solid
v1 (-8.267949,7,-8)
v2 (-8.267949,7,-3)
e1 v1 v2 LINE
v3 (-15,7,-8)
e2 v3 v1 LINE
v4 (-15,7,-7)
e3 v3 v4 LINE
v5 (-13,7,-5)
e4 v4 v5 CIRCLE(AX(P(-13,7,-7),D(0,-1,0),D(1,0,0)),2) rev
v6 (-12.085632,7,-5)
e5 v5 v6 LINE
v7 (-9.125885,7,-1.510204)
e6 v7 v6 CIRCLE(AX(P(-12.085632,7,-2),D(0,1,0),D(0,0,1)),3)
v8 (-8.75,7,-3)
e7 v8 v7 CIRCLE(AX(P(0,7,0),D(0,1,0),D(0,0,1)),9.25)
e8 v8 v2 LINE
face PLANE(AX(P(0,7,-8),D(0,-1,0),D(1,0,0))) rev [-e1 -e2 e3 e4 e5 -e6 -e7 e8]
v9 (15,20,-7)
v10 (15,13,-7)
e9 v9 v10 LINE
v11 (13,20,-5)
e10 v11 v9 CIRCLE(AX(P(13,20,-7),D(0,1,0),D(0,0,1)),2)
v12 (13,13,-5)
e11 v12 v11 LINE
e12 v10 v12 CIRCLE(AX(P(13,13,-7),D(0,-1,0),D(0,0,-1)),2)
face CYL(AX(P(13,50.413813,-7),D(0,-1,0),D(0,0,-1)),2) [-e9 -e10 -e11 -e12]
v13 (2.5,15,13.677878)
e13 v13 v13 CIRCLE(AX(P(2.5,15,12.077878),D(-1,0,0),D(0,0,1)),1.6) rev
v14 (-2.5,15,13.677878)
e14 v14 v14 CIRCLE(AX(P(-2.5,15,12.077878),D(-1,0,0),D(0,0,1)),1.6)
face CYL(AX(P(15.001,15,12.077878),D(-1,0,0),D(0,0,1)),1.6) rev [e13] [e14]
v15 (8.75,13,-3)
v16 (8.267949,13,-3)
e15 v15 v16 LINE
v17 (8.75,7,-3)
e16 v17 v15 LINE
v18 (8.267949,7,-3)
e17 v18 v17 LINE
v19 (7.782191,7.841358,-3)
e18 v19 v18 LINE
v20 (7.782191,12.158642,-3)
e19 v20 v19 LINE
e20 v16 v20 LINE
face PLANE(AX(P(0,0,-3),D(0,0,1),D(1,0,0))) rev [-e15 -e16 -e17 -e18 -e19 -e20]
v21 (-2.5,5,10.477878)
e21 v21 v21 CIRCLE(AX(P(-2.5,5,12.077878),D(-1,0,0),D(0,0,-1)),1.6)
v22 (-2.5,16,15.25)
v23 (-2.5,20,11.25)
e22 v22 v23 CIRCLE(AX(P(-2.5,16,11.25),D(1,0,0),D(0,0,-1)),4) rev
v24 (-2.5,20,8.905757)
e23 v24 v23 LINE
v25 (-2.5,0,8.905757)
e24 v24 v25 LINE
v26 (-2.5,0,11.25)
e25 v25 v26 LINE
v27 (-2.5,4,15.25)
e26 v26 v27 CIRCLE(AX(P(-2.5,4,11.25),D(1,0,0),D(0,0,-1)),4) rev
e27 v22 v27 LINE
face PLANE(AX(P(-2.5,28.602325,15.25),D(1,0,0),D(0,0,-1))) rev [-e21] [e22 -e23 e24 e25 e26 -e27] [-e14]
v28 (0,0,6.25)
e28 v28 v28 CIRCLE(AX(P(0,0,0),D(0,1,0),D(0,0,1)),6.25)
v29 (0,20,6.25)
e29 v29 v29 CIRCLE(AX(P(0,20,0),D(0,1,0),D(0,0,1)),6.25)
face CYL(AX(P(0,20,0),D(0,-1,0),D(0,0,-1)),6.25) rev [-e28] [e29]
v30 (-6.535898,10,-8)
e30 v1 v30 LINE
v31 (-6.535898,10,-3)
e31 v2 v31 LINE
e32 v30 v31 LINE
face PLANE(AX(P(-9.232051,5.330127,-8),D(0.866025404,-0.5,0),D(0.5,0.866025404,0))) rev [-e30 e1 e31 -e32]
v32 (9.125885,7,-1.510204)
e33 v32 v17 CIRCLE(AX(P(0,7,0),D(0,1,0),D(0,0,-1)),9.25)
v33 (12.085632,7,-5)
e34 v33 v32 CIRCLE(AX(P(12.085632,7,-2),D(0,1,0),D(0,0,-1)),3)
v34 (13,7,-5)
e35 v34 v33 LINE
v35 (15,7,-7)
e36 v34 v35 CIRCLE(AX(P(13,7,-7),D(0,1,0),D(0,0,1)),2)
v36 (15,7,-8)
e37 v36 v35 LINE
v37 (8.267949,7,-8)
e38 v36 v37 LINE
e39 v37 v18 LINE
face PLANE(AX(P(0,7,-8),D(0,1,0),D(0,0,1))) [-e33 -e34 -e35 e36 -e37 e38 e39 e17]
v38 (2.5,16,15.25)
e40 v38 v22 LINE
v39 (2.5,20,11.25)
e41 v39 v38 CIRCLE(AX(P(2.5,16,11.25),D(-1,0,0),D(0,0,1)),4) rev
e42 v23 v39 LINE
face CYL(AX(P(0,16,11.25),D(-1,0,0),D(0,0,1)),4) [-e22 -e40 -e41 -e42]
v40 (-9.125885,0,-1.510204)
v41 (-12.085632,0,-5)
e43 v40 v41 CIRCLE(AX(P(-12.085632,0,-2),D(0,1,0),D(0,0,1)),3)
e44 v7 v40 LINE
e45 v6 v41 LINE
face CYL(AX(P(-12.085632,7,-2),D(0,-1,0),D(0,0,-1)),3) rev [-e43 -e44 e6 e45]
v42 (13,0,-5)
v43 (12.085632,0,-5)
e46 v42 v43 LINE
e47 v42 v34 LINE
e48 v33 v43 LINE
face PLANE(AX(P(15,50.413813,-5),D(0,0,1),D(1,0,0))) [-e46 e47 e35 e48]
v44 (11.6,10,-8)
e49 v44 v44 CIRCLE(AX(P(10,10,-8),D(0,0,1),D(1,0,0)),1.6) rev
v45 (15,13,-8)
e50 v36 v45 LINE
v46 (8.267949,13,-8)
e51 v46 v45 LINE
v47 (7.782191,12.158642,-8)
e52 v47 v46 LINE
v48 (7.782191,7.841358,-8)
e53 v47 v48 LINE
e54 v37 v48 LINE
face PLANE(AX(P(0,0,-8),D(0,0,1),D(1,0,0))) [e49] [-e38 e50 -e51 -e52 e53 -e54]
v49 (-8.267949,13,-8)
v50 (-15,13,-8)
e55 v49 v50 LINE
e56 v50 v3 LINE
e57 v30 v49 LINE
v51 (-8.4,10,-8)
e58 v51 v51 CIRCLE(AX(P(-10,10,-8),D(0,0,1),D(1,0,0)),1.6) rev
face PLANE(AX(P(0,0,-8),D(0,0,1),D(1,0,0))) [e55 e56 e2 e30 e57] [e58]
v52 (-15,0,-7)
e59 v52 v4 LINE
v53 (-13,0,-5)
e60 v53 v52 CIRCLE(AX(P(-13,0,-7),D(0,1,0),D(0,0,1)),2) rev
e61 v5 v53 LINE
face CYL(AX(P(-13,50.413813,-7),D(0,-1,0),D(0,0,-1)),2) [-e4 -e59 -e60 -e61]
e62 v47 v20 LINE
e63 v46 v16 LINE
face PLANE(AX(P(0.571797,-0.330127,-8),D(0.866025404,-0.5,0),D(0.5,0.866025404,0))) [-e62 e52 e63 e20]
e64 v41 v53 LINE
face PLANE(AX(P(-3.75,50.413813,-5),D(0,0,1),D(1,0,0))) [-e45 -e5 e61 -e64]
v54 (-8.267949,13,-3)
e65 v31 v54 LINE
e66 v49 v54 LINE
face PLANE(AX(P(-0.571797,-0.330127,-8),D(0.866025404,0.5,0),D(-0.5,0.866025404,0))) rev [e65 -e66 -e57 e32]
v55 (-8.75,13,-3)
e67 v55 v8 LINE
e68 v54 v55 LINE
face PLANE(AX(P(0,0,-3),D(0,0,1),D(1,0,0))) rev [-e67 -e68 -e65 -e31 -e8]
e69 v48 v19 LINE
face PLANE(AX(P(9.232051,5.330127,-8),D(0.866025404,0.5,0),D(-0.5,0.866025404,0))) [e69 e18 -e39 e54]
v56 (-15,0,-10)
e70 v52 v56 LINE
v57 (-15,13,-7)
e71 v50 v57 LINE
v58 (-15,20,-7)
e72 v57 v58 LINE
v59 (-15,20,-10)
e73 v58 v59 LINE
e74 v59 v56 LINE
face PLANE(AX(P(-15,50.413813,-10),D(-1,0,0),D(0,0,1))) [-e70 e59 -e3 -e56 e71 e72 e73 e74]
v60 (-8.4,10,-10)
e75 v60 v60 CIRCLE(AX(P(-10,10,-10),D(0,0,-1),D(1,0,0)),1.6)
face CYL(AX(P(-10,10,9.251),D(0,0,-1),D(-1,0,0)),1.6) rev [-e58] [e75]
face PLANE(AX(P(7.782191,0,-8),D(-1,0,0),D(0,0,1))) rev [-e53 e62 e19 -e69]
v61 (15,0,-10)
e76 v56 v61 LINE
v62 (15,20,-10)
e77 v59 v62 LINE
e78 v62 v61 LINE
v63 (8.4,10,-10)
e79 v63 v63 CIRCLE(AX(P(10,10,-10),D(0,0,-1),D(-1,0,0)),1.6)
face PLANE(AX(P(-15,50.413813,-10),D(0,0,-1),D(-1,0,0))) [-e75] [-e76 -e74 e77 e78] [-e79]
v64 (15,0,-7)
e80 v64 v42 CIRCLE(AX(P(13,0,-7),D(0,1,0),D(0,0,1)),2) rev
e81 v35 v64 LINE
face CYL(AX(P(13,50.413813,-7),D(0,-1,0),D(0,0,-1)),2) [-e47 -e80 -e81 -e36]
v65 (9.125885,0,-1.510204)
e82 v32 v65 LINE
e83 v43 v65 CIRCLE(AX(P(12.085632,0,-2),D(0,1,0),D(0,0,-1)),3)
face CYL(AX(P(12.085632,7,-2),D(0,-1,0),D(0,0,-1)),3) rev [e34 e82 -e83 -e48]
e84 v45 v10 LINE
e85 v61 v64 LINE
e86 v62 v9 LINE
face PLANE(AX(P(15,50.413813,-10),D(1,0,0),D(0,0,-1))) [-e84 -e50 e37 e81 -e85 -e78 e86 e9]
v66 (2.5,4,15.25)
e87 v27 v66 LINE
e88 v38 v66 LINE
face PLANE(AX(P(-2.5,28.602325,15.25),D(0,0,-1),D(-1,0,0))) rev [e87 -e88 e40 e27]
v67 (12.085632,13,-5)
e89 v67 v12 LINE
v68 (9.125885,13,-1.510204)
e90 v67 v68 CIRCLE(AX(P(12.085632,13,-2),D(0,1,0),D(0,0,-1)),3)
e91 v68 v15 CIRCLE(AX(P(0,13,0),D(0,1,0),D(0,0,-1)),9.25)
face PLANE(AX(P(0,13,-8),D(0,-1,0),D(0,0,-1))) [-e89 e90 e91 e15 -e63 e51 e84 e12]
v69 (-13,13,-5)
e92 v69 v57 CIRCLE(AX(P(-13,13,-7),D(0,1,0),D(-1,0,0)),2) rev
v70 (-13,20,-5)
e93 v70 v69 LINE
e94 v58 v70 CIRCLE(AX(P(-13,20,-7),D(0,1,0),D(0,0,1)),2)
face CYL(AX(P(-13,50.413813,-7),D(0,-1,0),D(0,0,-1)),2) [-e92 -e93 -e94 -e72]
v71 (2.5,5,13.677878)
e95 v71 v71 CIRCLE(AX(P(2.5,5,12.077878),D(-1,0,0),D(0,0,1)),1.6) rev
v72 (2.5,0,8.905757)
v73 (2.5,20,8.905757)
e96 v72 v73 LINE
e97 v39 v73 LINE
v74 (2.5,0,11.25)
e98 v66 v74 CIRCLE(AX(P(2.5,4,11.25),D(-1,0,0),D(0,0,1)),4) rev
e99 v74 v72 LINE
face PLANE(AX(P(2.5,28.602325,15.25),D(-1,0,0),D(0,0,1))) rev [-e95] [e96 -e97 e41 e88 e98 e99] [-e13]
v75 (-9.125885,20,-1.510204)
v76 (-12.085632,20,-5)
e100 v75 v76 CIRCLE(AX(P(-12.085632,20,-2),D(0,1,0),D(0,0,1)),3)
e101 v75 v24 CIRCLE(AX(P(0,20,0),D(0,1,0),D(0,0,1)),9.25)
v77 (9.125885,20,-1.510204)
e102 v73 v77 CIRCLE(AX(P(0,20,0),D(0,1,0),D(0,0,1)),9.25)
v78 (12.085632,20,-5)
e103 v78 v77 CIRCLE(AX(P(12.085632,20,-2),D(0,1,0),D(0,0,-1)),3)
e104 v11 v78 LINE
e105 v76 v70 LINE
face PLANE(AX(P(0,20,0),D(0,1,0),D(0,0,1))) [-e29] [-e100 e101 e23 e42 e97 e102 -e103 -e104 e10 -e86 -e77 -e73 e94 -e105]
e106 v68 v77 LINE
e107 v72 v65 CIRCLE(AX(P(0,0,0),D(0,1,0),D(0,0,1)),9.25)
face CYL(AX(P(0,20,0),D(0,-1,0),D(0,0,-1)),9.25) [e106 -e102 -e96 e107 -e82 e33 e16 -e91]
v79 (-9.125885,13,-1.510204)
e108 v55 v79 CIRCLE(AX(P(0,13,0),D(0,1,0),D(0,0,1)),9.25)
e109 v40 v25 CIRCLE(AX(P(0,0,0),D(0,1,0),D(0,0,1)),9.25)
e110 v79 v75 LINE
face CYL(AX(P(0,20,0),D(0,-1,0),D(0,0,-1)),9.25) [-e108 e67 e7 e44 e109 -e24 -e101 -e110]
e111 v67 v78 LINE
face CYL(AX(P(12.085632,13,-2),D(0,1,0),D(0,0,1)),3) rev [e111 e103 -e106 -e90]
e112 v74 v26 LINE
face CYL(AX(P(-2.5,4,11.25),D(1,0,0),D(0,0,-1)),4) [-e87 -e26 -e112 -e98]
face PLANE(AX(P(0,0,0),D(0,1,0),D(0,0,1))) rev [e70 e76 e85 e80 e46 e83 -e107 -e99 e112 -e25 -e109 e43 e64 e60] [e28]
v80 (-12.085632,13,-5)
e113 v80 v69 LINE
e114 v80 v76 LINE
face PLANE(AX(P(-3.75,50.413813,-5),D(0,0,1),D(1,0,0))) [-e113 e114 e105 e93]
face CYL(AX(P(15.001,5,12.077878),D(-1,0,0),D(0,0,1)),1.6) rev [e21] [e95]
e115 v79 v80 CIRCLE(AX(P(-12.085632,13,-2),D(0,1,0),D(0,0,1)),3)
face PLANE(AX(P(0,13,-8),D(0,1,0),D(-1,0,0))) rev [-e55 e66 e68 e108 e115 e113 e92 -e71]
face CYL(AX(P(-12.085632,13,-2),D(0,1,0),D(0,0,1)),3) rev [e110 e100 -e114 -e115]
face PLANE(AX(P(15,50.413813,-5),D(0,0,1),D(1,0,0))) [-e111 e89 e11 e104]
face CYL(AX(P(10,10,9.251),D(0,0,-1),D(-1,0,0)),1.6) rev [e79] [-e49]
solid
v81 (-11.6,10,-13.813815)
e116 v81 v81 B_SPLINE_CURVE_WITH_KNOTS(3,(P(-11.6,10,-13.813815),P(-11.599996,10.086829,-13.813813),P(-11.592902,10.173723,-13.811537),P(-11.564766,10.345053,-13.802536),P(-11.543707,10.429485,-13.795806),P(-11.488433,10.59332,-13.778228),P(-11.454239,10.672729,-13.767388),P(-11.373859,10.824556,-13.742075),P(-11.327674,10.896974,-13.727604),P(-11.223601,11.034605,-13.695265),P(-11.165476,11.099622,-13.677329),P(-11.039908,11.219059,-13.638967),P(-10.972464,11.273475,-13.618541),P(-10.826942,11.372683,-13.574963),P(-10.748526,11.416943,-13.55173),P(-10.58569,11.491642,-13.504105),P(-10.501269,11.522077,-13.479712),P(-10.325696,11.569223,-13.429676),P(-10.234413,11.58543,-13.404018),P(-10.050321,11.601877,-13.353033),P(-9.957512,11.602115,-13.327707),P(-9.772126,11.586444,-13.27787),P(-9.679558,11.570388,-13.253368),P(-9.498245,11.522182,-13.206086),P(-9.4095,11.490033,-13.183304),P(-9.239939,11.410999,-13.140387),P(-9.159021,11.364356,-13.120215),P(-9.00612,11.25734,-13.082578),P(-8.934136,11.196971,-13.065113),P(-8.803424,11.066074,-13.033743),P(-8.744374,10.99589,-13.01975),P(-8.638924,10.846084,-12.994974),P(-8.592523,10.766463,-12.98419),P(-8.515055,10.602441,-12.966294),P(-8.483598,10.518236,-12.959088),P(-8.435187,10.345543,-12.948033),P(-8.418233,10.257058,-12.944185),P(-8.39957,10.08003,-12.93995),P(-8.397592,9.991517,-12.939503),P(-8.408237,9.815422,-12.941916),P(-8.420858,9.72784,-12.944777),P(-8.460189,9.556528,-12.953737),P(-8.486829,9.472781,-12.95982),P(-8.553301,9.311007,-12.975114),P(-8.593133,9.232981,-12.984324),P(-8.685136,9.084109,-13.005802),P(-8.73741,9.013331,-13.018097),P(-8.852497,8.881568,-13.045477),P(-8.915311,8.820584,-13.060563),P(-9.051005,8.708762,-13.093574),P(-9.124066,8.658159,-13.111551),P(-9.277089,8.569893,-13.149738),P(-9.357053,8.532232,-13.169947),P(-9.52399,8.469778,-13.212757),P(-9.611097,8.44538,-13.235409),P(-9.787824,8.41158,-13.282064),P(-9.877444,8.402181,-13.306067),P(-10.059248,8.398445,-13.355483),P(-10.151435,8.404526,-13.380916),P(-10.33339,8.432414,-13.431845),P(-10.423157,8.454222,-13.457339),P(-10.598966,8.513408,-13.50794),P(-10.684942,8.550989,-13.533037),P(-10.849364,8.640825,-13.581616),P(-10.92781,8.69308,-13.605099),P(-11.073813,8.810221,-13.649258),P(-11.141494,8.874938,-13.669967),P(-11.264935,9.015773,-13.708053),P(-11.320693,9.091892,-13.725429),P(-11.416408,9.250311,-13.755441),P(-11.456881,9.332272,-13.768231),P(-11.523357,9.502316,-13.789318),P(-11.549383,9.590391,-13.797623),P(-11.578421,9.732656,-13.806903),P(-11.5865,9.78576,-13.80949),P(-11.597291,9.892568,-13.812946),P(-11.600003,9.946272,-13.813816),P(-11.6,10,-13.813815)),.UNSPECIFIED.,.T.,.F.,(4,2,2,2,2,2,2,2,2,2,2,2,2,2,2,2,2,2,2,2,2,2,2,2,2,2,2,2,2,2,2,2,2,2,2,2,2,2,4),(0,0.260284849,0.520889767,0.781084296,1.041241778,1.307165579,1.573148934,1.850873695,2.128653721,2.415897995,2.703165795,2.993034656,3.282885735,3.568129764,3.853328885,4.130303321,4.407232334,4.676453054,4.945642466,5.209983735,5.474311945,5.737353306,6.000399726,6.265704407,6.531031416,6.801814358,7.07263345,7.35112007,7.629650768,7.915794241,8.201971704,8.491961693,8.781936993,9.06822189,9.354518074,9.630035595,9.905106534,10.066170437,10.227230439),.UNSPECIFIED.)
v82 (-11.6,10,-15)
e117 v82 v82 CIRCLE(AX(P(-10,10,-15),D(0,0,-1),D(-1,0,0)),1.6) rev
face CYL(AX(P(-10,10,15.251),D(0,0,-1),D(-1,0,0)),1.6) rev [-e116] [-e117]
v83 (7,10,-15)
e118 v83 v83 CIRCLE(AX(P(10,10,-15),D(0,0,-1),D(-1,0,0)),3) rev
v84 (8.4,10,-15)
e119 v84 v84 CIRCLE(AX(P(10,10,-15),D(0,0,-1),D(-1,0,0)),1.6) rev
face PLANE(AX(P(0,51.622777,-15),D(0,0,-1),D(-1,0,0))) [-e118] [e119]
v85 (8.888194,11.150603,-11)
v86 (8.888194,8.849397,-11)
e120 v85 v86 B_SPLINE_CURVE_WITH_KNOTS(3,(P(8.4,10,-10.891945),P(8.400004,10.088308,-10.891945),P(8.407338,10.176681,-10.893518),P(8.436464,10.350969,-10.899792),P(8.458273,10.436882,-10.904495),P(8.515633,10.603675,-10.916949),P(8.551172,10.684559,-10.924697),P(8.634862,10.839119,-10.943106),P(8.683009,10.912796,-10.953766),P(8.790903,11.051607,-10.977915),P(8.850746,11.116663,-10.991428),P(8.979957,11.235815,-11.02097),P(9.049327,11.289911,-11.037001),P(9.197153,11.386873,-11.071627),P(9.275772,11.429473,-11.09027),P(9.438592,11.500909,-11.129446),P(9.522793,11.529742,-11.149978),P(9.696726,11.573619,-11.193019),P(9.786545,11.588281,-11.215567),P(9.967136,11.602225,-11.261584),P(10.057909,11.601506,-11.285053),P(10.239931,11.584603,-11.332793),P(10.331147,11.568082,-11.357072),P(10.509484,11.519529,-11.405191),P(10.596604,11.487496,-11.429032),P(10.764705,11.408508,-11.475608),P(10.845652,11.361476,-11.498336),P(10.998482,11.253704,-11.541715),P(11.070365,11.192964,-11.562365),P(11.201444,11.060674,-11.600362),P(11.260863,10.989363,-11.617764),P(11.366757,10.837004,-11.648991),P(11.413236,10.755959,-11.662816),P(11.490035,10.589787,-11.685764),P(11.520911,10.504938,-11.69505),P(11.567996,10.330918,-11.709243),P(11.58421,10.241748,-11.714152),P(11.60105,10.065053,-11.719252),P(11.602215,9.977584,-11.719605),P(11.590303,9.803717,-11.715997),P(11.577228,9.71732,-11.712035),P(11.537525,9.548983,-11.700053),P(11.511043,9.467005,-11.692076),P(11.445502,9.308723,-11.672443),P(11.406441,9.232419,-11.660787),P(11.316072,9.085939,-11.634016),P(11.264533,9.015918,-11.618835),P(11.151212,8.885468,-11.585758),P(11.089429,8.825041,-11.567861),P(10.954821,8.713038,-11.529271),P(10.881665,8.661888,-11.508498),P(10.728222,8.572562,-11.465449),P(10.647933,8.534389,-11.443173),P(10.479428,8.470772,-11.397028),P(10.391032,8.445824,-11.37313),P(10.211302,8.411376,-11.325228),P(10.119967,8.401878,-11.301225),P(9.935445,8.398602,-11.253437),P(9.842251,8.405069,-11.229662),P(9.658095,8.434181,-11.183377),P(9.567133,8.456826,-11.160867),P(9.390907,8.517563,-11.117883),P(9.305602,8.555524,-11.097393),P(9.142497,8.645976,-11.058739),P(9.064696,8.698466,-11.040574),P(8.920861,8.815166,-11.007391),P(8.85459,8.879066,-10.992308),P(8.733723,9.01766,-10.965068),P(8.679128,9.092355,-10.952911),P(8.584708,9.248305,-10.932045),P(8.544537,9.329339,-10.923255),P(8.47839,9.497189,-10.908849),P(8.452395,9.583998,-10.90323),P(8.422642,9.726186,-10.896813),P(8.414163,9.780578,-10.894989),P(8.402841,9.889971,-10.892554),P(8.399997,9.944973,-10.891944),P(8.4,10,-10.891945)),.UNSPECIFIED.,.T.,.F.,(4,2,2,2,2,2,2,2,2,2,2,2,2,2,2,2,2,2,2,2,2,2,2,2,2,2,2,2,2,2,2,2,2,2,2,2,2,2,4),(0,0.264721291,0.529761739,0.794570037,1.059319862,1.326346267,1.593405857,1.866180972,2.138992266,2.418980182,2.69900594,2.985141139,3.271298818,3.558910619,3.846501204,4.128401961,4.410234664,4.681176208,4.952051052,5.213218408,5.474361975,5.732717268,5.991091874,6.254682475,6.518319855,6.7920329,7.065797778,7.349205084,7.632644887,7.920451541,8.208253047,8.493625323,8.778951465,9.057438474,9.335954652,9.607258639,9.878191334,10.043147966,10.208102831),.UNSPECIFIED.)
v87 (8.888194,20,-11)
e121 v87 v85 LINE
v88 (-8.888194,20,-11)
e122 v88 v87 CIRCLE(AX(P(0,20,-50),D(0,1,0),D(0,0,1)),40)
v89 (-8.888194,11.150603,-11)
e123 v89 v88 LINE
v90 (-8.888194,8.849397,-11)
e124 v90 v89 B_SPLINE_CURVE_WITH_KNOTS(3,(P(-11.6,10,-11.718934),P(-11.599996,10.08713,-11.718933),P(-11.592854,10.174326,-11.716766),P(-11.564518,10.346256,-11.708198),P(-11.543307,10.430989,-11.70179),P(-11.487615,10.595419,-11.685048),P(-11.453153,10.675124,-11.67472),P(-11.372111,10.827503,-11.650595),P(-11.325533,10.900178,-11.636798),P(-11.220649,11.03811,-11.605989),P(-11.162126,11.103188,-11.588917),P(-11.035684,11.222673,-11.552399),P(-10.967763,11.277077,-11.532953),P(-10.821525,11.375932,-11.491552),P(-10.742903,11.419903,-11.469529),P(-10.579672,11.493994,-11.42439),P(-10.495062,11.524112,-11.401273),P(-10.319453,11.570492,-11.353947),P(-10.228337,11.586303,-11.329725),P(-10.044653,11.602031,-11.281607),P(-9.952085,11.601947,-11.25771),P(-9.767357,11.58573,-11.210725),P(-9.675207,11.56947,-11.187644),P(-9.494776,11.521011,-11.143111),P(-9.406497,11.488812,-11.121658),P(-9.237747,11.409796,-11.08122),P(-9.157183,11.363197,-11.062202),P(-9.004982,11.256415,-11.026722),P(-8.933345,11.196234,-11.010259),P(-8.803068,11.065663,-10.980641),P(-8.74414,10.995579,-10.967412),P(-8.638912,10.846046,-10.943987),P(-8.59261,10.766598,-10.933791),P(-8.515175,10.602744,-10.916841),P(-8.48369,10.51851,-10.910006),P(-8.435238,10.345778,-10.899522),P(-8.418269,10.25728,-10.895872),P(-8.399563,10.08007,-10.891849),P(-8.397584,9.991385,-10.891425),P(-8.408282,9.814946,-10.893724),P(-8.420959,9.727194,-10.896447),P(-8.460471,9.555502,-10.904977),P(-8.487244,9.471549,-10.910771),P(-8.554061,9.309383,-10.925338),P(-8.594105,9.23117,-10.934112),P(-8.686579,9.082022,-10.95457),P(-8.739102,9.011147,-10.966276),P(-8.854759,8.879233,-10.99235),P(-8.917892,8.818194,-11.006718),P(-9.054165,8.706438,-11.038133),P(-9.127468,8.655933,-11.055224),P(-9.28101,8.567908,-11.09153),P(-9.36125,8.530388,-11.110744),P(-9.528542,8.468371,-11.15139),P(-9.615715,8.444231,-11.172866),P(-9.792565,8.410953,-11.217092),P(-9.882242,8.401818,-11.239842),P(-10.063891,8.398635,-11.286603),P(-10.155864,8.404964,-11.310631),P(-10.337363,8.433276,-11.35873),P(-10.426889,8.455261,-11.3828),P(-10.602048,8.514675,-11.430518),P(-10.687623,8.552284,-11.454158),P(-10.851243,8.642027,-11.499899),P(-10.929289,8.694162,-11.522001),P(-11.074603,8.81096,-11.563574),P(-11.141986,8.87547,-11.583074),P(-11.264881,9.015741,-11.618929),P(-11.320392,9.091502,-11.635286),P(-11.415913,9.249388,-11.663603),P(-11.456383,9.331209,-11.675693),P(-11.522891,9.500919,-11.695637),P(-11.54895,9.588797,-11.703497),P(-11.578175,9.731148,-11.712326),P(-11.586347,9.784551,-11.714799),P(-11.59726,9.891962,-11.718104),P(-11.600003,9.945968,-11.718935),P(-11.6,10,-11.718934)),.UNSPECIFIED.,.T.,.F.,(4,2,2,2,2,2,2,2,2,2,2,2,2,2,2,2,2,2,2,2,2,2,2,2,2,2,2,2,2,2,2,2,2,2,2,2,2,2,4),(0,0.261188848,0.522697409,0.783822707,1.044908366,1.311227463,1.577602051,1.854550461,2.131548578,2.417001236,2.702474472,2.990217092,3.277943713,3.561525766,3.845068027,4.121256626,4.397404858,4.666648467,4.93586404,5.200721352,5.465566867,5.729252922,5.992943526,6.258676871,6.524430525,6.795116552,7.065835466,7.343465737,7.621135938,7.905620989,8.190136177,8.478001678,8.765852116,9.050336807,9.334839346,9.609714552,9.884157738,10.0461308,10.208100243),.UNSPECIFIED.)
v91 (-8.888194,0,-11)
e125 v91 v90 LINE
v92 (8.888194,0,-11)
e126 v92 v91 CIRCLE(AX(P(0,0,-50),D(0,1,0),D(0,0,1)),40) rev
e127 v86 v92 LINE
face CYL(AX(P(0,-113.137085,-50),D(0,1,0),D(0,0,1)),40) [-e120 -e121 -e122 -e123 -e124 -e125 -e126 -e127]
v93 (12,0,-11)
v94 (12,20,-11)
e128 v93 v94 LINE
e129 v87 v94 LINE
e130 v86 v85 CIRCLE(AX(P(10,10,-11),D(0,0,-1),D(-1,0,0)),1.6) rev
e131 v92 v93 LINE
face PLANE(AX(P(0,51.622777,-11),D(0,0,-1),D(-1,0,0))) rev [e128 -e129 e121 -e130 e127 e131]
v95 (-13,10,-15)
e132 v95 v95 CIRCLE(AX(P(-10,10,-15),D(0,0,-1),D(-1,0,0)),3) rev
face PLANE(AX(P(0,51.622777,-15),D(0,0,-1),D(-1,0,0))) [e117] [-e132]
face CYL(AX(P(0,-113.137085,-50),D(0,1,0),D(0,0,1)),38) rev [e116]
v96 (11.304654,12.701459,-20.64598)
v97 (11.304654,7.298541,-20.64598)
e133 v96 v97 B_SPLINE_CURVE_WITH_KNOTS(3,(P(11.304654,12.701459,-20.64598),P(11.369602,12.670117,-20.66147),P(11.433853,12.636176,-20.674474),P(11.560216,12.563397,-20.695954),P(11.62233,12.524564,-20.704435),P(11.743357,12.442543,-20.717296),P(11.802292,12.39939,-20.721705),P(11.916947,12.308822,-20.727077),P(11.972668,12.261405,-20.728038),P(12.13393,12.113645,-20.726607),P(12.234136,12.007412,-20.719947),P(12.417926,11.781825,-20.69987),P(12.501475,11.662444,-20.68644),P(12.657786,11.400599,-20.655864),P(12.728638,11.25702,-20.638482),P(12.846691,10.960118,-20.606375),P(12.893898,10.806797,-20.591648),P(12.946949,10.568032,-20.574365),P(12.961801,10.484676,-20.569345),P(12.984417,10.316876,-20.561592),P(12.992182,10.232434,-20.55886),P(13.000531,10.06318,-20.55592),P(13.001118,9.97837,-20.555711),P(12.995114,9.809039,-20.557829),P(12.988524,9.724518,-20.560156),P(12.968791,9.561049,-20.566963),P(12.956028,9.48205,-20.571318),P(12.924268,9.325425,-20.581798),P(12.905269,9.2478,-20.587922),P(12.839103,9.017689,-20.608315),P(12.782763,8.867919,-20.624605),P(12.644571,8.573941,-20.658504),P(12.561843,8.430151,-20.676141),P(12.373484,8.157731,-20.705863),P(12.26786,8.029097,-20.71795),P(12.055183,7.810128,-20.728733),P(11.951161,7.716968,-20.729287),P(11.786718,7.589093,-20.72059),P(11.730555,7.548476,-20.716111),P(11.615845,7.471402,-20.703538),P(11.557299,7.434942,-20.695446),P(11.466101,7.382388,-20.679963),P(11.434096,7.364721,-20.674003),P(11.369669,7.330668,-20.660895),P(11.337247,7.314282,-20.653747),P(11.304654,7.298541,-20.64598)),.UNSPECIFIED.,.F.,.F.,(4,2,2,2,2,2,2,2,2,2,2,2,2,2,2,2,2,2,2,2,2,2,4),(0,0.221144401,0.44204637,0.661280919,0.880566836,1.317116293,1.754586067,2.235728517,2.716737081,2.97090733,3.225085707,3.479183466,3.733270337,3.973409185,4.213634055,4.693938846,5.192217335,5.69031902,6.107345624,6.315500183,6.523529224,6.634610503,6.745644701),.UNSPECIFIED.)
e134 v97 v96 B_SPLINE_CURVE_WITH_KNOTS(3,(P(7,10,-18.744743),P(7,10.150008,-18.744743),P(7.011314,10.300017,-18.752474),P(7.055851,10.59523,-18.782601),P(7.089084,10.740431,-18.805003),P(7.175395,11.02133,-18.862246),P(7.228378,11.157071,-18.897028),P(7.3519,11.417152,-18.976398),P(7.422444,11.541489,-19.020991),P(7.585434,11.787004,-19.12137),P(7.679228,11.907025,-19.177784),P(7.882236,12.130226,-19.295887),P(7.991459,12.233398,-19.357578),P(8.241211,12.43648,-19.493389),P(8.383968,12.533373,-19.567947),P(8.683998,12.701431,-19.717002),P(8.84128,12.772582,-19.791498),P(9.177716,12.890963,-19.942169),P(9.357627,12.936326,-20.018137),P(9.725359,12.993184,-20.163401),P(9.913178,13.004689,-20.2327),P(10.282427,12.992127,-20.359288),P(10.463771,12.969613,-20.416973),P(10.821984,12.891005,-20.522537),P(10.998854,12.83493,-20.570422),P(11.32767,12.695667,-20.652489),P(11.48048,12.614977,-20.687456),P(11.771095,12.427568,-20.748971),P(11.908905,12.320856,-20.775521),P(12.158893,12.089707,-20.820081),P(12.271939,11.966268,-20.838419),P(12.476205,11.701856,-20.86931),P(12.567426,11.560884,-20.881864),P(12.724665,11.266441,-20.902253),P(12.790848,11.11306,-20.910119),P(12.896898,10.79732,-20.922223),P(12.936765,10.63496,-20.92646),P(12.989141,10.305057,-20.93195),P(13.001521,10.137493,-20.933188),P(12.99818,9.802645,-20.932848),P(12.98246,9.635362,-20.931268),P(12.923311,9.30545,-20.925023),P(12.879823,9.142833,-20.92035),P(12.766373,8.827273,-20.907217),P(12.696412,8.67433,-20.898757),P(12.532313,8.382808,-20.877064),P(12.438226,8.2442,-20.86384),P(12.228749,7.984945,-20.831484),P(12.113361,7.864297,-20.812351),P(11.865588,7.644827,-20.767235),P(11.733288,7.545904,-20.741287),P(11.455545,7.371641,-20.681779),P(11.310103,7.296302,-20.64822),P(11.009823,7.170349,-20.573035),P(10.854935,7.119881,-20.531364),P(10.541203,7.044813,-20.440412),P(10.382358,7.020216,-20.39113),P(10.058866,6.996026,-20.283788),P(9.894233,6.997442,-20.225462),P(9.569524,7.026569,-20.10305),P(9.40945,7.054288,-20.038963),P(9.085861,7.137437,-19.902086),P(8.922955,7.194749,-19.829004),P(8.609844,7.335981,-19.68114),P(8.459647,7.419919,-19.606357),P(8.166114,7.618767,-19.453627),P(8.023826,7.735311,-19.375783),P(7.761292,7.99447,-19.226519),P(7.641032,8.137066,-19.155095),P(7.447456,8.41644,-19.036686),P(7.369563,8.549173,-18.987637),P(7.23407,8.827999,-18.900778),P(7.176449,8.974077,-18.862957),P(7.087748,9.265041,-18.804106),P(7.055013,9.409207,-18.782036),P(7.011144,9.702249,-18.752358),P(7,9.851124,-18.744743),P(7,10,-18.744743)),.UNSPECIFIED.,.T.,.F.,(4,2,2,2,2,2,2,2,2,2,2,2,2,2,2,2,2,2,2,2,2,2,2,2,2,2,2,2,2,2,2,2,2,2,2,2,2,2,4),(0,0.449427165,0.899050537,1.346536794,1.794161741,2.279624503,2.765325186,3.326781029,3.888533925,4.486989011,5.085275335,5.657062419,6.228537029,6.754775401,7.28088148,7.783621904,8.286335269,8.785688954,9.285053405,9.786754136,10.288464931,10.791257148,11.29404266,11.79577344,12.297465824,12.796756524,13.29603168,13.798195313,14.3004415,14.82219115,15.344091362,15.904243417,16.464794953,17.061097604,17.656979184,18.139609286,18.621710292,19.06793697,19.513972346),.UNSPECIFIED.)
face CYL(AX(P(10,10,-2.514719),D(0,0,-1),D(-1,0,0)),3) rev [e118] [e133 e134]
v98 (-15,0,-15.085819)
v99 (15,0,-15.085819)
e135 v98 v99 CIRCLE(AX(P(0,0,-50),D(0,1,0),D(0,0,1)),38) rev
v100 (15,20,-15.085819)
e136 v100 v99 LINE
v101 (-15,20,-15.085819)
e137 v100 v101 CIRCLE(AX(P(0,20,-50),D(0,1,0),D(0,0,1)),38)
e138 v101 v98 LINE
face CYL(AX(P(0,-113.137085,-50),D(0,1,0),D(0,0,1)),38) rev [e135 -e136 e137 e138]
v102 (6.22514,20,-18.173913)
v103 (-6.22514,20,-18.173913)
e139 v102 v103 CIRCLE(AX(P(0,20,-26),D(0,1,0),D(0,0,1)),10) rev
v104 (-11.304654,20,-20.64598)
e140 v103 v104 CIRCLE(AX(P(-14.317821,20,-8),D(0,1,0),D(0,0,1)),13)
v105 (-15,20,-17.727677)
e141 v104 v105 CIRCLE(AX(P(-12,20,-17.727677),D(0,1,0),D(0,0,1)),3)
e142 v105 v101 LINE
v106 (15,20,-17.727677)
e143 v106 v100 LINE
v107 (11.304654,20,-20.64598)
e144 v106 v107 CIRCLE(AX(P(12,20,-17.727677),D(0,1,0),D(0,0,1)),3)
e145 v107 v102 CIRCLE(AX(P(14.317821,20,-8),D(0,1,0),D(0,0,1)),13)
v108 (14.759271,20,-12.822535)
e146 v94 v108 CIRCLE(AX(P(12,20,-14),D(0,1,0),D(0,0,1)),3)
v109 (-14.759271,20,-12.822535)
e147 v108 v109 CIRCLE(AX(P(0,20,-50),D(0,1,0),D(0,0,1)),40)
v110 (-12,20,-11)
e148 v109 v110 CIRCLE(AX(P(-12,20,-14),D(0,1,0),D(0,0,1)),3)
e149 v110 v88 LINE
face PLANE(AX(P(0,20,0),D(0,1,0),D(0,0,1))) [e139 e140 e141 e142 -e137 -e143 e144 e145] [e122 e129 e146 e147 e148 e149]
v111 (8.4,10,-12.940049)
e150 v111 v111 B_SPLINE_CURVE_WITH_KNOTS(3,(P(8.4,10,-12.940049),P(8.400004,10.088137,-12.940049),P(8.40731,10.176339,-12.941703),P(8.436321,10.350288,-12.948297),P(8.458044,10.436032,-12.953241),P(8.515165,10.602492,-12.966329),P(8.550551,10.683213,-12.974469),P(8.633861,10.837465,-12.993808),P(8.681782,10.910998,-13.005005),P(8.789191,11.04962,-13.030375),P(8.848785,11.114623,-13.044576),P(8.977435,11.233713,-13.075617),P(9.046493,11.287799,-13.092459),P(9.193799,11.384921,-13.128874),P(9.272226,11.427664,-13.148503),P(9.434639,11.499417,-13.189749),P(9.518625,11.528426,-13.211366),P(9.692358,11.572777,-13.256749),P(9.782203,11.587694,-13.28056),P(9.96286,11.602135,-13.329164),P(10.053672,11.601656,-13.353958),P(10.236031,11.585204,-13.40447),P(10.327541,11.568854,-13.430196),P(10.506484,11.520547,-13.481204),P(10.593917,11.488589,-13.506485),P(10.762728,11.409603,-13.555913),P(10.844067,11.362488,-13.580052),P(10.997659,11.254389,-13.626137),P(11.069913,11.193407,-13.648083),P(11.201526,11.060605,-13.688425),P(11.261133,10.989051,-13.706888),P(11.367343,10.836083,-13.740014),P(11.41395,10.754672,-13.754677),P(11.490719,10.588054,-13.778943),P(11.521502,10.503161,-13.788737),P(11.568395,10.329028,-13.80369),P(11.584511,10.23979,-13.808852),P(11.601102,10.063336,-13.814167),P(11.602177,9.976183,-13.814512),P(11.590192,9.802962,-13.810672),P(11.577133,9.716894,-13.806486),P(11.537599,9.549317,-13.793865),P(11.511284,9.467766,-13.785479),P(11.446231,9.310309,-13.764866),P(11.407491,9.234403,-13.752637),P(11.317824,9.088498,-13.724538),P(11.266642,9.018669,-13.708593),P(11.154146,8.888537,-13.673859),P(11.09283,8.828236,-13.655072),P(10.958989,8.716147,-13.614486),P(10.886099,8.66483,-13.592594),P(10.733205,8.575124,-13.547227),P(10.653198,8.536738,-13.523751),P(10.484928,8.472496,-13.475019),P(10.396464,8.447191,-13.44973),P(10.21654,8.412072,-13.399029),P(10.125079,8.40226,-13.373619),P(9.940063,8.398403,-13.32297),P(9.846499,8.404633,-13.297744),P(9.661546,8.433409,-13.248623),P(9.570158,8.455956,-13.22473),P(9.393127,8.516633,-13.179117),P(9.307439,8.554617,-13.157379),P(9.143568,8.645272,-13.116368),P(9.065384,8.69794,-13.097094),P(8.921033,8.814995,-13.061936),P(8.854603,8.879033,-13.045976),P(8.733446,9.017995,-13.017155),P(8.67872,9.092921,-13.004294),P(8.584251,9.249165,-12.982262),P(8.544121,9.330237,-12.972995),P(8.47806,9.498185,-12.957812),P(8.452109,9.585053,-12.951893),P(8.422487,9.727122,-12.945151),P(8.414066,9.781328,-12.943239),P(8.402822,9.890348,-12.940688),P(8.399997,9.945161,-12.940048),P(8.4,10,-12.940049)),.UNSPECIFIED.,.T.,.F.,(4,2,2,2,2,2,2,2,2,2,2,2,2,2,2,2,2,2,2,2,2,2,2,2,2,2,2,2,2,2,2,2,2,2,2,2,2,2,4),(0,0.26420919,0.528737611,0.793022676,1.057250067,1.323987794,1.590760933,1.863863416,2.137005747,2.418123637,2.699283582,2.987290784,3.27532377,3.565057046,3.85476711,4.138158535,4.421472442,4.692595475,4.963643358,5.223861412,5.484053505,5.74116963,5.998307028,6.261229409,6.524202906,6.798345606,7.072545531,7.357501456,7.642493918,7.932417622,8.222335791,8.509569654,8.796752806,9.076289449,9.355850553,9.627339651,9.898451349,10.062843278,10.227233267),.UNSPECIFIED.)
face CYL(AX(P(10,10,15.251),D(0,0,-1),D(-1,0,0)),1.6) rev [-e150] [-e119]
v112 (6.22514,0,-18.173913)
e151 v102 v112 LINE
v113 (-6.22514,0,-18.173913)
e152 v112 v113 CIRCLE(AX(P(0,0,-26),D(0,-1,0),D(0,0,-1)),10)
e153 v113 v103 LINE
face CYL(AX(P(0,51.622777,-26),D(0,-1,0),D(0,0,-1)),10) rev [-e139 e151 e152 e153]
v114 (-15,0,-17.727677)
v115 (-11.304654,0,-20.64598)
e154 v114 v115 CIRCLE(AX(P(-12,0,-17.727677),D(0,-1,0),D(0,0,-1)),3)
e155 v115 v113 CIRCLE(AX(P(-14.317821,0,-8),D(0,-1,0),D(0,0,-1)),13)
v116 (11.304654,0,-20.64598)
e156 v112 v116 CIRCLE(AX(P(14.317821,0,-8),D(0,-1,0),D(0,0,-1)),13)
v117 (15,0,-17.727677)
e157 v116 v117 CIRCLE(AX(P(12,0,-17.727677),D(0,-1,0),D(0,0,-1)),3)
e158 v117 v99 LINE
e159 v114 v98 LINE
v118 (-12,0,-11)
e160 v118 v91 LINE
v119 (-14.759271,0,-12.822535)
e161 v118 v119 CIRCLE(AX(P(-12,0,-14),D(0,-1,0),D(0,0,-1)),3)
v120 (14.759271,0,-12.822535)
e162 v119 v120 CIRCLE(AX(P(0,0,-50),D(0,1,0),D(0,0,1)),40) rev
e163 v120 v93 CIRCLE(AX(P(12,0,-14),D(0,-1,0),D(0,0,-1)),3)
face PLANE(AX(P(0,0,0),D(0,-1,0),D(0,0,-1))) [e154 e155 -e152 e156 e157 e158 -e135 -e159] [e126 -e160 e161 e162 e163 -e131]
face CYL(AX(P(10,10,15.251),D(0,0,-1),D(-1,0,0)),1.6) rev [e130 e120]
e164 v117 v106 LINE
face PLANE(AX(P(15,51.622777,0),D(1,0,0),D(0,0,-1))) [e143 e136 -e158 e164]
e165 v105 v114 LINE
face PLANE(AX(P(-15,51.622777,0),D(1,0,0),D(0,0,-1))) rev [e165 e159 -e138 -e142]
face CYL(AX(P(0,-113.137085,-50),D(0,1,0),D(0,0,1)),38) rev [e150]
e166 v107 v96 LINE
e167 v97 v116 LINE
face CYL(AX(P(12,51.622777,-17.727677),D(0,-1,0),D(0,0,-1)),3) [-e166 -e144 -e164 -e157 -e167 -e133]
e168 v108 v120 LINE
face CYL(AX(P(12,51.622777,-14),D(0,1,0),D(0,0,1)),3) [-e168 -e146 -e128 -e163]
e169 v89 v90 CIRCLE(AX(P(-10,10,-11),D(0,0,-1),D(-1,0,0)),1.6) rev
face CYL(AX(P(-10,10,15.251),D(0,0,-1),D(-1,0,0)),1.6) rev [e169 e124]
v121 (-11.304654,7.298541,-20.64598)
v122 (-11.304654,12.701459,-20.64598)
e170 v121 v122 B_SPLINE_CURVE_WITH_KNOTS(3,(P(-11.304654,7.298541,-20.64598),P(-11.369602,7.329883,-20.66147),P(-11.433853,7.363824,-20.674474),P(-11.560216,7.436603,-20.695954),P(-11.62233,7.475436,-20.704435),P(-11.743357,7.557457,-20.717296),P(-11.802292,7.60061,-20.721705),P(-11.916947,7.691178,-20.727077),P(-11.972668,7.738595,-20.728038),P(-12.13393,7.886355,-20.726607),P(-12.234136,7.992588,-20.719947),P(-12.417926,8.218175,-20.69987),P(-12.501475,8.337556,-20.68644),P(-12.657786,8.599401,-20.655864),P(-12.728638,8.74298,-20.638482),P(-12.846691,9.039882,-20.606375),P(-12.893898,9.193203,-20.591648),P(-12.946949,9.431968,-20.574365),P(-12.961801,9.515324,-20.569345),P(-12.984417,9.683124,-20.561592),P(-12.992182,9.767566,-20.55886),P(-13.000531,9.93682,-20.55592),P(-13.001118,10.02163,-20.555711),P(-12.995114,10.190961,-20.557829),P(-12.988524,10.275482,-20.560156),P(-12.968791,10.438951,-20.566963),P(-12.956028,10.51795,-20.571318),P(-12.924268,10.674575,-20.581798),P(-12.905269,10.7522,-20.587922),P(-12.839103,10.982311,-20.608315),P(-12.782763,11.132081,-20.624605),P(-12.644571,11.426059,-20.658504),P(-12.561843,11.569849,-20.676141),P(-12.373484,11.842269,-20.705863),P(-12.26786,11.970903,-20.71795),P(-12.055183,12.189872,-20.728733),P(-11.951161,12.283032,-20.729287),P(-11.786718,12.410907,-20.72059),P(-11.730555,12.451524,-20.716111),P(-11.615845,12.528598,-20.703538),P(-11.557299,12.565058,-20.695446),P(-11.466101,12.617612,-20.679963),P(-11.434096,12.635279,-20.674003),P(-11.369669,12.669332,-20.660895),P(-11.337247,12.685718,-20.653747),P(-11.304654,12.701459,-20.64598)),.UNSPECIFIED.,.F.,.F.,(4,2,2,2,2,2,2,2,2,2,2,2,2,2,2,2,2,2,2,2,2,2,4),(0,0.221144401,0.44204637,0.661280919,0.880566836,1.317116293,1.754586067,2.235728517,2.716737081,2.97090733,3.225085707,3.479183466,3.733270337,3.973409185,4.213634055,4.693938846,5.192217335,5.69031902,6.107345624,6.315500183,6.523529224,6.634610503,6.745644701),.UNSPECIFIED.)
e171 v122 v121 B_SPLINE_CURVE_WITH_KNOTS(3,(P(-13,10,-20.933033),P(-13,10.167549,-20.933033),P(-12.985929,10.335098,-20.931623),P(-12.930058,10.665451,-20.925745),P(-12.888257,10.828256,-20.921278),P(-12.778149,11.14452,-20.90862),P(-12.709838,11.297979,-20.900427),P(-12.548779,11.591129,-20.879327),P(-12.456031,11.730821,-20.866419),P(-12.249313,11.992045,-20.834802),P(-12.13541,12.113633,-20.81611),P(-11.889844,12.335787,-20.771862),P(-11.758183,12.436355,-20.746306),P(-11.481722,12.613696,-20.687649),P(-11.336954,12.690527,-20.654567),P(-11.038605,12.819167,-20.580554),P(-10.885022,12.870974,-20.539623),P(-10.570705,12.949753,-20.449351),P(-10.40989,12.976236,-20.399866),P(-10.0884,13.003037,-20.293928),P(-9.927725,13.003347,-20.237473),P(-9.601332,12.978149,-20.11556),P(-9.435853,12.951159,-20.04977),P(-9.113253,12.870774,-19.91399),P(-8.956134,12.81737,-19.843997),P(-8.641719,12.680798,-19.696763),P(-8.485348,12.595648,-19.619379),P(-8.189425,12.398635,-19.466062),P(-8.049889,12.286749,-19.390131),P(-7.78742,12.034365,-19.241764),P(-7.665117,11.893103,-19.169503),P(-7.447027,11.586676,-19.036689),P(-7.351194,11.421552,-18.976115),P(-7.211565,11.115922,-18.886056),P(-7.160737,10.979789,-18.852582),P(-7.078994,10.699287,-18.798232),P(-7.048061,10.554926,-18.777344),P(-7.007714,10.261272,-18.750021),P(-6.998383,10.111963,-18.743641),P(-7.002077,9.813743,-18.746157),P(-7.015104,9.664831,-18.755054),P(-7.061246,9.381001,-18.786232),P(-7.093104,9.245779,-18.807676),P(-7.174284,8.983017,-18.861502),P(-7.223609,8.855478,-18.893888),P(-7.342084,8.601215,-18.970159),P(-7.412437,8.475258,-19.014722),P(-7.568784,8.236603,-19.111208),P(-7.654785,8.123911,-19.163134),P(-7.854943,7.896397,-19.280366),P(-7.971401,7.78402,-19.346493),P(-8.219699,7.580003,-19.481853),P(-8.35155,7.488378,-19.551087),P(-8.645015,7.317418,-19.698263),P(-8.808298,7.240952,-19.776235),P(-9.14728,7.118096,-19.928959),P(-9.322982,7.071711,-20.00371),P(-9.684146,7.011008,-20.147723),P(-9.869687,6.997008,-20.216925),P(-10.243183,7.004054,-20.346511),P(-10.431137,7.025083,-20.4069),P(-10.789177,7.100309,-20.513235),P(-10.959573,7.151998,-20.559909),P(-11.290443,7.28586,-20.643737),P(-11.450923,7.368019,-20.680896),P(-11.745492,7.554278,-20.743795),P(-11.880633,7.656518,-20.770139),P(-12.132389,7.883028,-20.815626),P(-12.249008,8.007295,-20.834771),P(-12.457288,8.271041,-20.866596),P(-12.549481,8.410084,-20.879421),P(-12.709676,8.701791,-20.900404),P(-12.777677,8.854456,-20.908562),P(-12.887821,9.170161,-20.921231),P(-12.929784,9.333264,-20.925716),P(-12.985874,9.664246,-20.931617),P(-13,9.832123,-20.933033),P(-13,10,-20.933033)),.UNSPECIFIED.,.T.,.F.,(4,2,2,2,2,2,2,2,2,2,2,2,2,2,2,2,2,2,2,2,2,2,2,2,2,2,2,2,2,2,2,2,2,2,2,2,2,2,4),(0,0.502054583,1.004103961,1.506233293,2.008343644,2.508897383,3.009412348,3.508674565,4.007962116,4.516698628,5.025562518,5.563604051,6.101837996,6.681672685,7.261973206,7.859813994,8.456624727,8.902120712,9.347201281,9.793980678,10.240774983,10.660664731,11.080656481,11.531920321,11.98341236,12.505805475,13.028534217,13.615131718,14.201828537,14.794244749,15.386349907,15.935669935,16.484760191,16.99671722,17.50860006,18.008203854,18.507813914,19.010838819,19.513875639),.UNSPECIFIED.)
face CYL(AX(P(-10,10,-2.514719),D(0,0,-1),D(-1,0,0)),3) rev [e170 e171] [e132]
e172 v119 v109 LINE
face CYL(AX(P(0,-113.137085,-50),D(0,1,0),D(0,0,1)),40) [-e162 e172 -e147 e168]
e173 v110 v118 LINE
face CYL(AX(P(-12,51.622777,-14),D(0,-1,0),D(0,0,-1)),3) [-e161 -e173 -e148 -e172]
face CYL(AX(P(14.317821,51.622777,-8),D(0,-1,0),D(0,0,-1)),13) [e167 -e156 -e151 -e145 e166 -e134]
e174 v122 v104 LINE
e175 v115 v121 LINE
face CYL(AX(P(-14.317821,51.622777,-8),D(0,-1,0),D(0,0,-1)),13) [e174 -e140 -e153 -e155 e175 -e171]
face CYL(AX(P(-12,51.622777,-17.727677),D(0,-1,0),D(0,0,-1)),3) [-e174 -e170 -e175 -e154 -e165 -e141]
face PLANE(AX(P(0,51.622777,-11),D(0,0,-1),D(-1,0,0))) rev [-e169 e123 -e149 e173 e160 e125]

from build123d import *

# Parameters (mm, degrees)
SKETCH_1_R           = 9.25
SKETCH_1_R_2         = 6.25
EXTRUDE_1_DEPTH      = 20
EXTRUDE_2_DEPTH      = 20
CUT_EXTRUDE_1_REACH  = 33.553
SKETCH_4_R           = 1.6
CUT_EXTRUDE_START    = -3
SKETCH_7_R           = 1.6
CUT_EXTRUDE_5_DEPTH  = 3
SKETCH_9_W           = 5
SKETCH_9_H           = 7
EXTRUDE_3_DEPTH      = 20
CUT_EXTRUDE_7_REACH  = 32.64
SKETCH_10_R          = 1.6
FILLET_1_R           = 4
EXTRUDE_4_DEPTH      = 7
CUT_EXTRUDE_8_DEPTH  = 5
EXTRUDE_5_DEPTH      = 1
EXTRUDE_6_DEPTH      = 20
FILLET_7_R           = 13
CUT_EXTRUDE_START_2  = -10
SKETCH_19_R          = 1.6
CUT_EXTRUDE_9_DEPTH  = 9.712728
SKETCH_20_R          = 3
CUT_EXTRUDE_10_DEPTH = 6
FILLET_4_R           = 2
FILLET_5_R           = 2
FILLET_6_R           = 3
EXTRUDE_START        = -20
SKETCH_21_R          = 40
SKETCH_21_R_2        = 38
EXTRUDE_7_DEPTH      = 20


with BuildPart() as part:
    # 草图1 → 凸台-拉伸1 (new body)
    with BuildSketch(Plane(origin=(0, 0, 0), x_dir=(1, 0, 0), z_dir=(0, 1, 0))):
        with Locations(Location((0, 0, 0), (0, 0, 270))):
            Circle(SKETCH_1_R)
        with Locations(Location((0, 0, 0), (0, 0, 270))):
            Circle(SKETCH_1_R_2, mode=Mode.SUBTRACT)
    extrude(amount=EXTRUDE_1_DEPTH)

    # 草图3 → 凸台-拉伸2 (add)
    with BuildSketch(Plane.XZ):
        with BuildLine():
            Line((-15, -10), (15, -10))
            Line((15, -10), (15, -5))
            Line((15, -5), (3.75, -5))
            ThreePointArc((3.75, -5), (0, -6.25), (-3.75, -5))
            Line((-3.75, -5), (-15, -5))
            Line((-15, -5), (-15, -10))
        make_face()
    extrude(amount=-EXTRUDE_2_DEPTH)

    # 草图4 → 切除-拉伸1 (cut, up to next)
    with BuildSketch(Plane(origin=(0, 0, -10), x_dir=(-1, 0, 0), z_dir=(0, 0, -1)), mode=Mode.PRIVATE) as cut_extrude_1_sk1:
        with Locations((-10, 10)):
            Circle(SKETCH_4_R)
    cut_extrude_1_tool1 = extrude(cut_extrude_1_sk1.sketch, amount=-CUT_EXTRUDE_1_REACH, mode=Mode.PRIVATE) & part.part
    # 草图4 → 切除-拉伸1 (cut, up to next)
    with BuildSketch(Plane(origin=(0, 0, -10), x_dir=(-1, 0, 0), z_dir=(0, 0, -1)), mode=Mode.PRIVATE) as cut_extrude_1_sk2:
        with Locations(Location((10, 10, 0), (0, 0, 180))):
            Circle(SKETCH_4_R)
    cut_extrude_1_tool2 = extrude(cut_extrude_1_sk2.sketch, amount=-CUT_EXTRUDE_1_REACH, mode=Mode.PRIVATE) & part.part
    add(cut_extrude_1_tool1.solids().sort_by_distance((10, 10, -10))[0], mode=Mode.SUBTRACT)
    add(cut_extrude_1_tool2.solids().sort_by_distance((-10, 10, -10))[0], mode=Mode.SUBTRACT)

    # 草图7 → 切除-拉伸5 (cut)
    # profile 1 of 2: a face of its own
    with BuildSketch(Plane.XY.offset(-5).offset(CUT_EXTRUDE_START)):
        Polygon((-15, 7), (-8.267949192, 7), (-6.535898385, 10), (-8.267949192, 13), (-15, 13), align=None)
        with Locations((-10, 10)):
            Circle(SKETCH_7_R, mode=Mode.SUBTRACT)
    # profile 2 of 2: a face of its own
    with BuildSketch(Plane.XY.offset(-5).offset(CUT_EXTRUDE_START)):
        Polygon((15, 13), (8.267949192, 13), (7.782191208, 12.158642491), (7.782191208, 7.841357509), (8.267949192, 7), (15, 7), align=None)
        with Locations(Location((10, 10, 0), (0, 0, 180))):
            Circle(SKETCH_7_R, mode=Mode.SUBTRACT)
    extrude(amount=CUT_EXTRUDE_5_DEPTH, mode=Mode.SUBTRACT)

    # 草图9 → 凸台-拉伸3 (add)
    with BuildSketch(Plane(origin=(0, 0, 0), x_dir=(1, 0, 0), z_dir=(0, 1, 0))):
        with Locations((0, -11.75)):
            Rectangle(SKETCH_9_W, SKETCH_9_H)
    extrude(amount=EXTRUDE_3_DEPTH)

    # 草图10 → 切除-拉伸7 (cut, up to next)
    with BuildSketch(Plane.ZY.offset(2.5), mode=Mode.PRIVATE) as cut_extrude_7_sk1:
        with Locations((12.077878283, 15)):
            Circle(SKETCH_10_R)
    cut_extrude_7_tool1 = extrude(cut_extrude_7_sk1.sketch, amount=-CUT_EXTRUDE_7_REACH, mode=Mode.PRIVATE) & part.part
    # 草图10 → 切除-拉伸7 (cut, up to next)
    with BuildSketch(Plane.ZY.offset(2.5), mode=Mode.PRIVATE) as cut_extrude_7_sk2:
        with Locations((12.077878283, 5)):
            Circle(SKETCH_10_R)
    cut_extrude_7_tool2 = extrude(cut_extrude_7_sk2.sketch, amount=-CUT_EXTRUDE_7_REACH, mode=Mode.PRIVATE) & part.part
    add(cut_extrude_7_tool1.solids().sort_by_distance((-2.5, 15, 12.077878))[0], mode=Mode.SUBTRACT)
    add(cut_extrude_7_tool2.solids().sort_by_distance((-2.5, 5, 12.077878))[0], mode=Mode.SUBTRACT)

    # 圆角1
    fillet_1_edges = [part.edges().sort_by_distance(p)[0] for p in [
        (0, 0, 15.25),
        (0, 20, 15.25),
    ]]
    fillet(fillet_1_edges, radius=FILLET_1_R)

    # 草图11 → 凸台-拉伸4 (add)
    with BuildSketch(Plane.XZ):
        with BuildLine():
            Line((12.085631965, -5), (7.782191208, -5))
            ThreePointArc((7.782191208, -5), (8.632232168, -3.323712952), (9.125885362, -1.510204082))
            ThreePointArc((9.125885362, -1.510204082), (9.797686626, -3.940439672), (12.085631965, -5))
        make_face()
        with BuildLine():
            Line((-12.085631965, -5), (-7.782191208, -5))
            ThreePointArc((-7.782191208, -5), (-8.632232168, -3.323712952), (-9.125885362, -1.510204082))
            ThreePointArc((-9.125885362, -1.510204082), (-9.797686626, -3.940439672), (-12.085631965, -5))
        make_face()
    extrude_4 = extrude(amount=-EXTRUDE_4_DEPTH)

    # 镜向2: 凸台-拉伸4 across plane
    add(extrude_4.mirror(Plane.ZX.offset(10)))

    # 草图16 → 切除-拉伸8 (cut)
    with BuildSketch(Plane.XY.offset(-8)):
        Polygon((8.267949192, 7), (15, 7), (15, 13), (8.267949192, 13), (7.782191208, 12.158642491), (7.782191208, 7.841357509), align=None)
        Polygon((-15, 7), (-8.267949192, 7), (-6.535898385, 10), (-8.267949192, 13), (-15, 13), align=None)
    extrude(amount=CUT_EXTRUDE_8_DEPTH, mode=Mode.SUBTRACT)

    # 草图17 → 凸台-拉伸5 (add)
    with BuildSketch(Plane.XY.offset(-5)):
        Polygon((-8.267949192, 7), (-7.782191208, 7), (-7.782191208, 7.841357509), align=None)
        Polygon((-7.782191208, 13), (-8.267949192, 13), (-7.782191208, 12.158642491), align=None)
        Polygon((7.782191208, 12.158642491), (8.267949192, 13), (7.782191208, 13), align=None)
        Polygon((7.782191208, 7.841357509), (7.782191208, 7), (8.267949192, 7), align=None)
    extrude(amount=EXTRUDE_5_DEPTH)


with BuildPart() as body_2:
    # Split Bodies 1: the piece on the far side of the plane
    add(part.part)
    split(bisect_by=Plane(origin=(0, 0, 0), x_dir=(0, 0, 1), z_dir=(1, 0, 0)), keep=Keep.BOTTOM)

    # 圆角5
    fillet_5_edges = [body_2.edges().sort_by_distance(p)[0] for p in [
        (-15, 3.5, -5),
        (-15, 16.5, -5),
    ]]
    fillet(fillet_5_edges, radius=FILLET_5_R)


with BuildPart() as part_1:
    add(part.part)

    # Split Bodies 1
    split(bisect_by=Plane(origin=(0, 0, 0), x_dir=(0, 0, 1), z_dir=(1, 0, 0)), keep=Keep.TOP)

    # 圆角4
    fillet_4_edges = [part_1.edges().sort_by_distance(p)[0] for p in [
        (15, 16.5, -5),
        (15, 3.5, -5),
    ]]
    fillet(fillet_4_edges, radius=FILLET_4_R)

    add(body_2.part)  # 凸台-拉伸7 merges body 2


with BuildPart() as body_3:
    # 草图18 → 凸台-拉伸6 (new body)
    with BuildSketch(Plane.XZ):
        with BuildLine():
            Line((0, -16), (0, -11))
            Line((0, -11), (-15, -11))
            Line((-15, -11), (-15, -21))
            Line((-15, -21), (-8.660254038, -21))
            ThreePointArc((-8.660254038, -21), (-5, -17.339745962), (0, -16))
        make_face()
        with BuildLine():
            Line((15, -11), (0, -11))
            Line((0, -11), (0, -16))
            ThreePointArc((0, -16), (5, -17.339745962), (8.660254038, -21))
            Line((8.660254038, -21), (15, -21))
            Line((15, -21), (15, -11))
        make_face()
    extrude(amount=-EXTRUDE_6_DEPTH)

    # 圆角7
    fillet_7_edges = [body_3.edges().sort_by_distance(p)[0] for p in [
        (-8.660254038, 10, -21),
        (8.660254038, 10, -21),
    ]]
    fillet(fillet_7_edges, radius=FILLET_7_R)

    # 草图19 → 切除-拉伸9 (cut)
    with BuildSketch(Plane(origin=(0, 0, -21), x_dir=(-1, 0, 0), z_dir=(0, 0, -1)).offset(CUT_EXTRUDE_START_2)):
        with Locations((10, 10)):
            Circle(SKETCH_19_R)
        with Locations((-10, 10)):
            Circle(SKETCH_19_R)
    extrude(amount=CUT_EXTRUDE_9_DEPTH, mode=Mode.SUBTRACT)

    # 草图20 → 切除-拉伸10 (cut)
    with BuildSketch(Plane(origin=(0, 0, -21), x_dir=(-1, 0, 0), z_dir=(0, 0, -1))):
        with Locations((10, 10)):
            Circle(SKETCH_20_R)
        with Locations((-10, 10)):
            Circle(SKETCH_20_R)
    extrude(amount=-CUT_EXTRUDE_10_DEPTH, mode=Mode.SUBTRACT)

    # 圆角6
    # the kernel refuses this fillet: 3 mm, written as the material it takes off along each edge
    with BuildSketch(Plane(origin=(-15, -7.5, -11), x_dir=(0, 0, -1), z_dir=(0, 1, 0)), Plane(origin=(15, -7.5, -11), x_dir=(-1, 0, 0), z_dir=(0, 1, 0))) as fillet_6_piece_1:
        with BuildLine():
            CenterArc((FILLET_6_R, -FILLET_6_R), FILLET_6_R, 90, 90)
            Line((0, -FILLET_6_R), (0, 0))
            Line((0, 0), (FILLET_6_R, 0))
        make_face()
    extrude(amount=35, mode=Mode.SUBTRACT)
    with BuildSketch(Plane(origin=(-15, -9.280663445, -21), x_dir=(0.9954423896624867, 0, 0.09536481983959225), z_dir=(0, 1, 0))) as fillet_6_piece_2:
        with BuildLine():
            CenterArc((3.298391634, -2.971314276), FILLET_6_R, 82.070303254, 103.40201453)
            Line((0.312064465, -3.257408735), (0.013431749, -3.286018181))
            Line((0.013431749, -3.286018181), (-0.298632717, -0.028609446))
            Line((-0.298632717, -0.028609446), (-0.028609446, 0.298632717))
            ThreePointArc((-0.028609446, 0.298632717), (0.650460385, 0.363688588), (3.753652752, 0.297131428))
            Line((3.753652752, 0.297131428), (3.712265378, 0))
        make_face()
    extrude(amount=38.56132689, mode=Mode.SUBTRACT)
    with BuildSketch(Plane(origin=(15, -9.280663445, -21), x_dir=(0, 0, 1), z_dir=(0, 1, 0))) as fillet_6_piece_3:
        with BuildLine():
            CenterArc((3.272322707, -3), FILLET_6_R, 90, 103.40201453)
            Line((0.354019519, -3.695346319), (0.0621892, -3.764880951))
            ThreePointArc((0.0621892, -3.764880951), (-0.3, -0.682178937), (-0.3, 0))
            Line((-0.3, 0), (0, 0.3))
            Line((0, 0.3), (3.272322707, 0.3))
            Line((3.272322707, 0.3), (3.272322707, 0))
        make_face()
    extrude(amount=38.56132689, mode=Mode.SUBTRACT)


with BuildPart() as part_2:
    add(part_1.part)

    add(body_3.part)  # 凸台-拉伸7 merges body 3
    # 草图21 → 凸台-拉伸7 (add)
    with BuildSketch(Plane(origin=(0, 20, 0), x_dir=(1, 0, 0), z_dir=(0, 1, 0)).offset(EXTRUDE_START)):
        with Locations((0, 50)):
            Circle(SKETCH_21_R)
        with Locations((0, 50)):
            Circle(SKETCH_21_R_2, mode=Mode.SUBTRACT)
    extrude(amount=EXTRUDE_7_DEPTH)


solid = part_2.part
